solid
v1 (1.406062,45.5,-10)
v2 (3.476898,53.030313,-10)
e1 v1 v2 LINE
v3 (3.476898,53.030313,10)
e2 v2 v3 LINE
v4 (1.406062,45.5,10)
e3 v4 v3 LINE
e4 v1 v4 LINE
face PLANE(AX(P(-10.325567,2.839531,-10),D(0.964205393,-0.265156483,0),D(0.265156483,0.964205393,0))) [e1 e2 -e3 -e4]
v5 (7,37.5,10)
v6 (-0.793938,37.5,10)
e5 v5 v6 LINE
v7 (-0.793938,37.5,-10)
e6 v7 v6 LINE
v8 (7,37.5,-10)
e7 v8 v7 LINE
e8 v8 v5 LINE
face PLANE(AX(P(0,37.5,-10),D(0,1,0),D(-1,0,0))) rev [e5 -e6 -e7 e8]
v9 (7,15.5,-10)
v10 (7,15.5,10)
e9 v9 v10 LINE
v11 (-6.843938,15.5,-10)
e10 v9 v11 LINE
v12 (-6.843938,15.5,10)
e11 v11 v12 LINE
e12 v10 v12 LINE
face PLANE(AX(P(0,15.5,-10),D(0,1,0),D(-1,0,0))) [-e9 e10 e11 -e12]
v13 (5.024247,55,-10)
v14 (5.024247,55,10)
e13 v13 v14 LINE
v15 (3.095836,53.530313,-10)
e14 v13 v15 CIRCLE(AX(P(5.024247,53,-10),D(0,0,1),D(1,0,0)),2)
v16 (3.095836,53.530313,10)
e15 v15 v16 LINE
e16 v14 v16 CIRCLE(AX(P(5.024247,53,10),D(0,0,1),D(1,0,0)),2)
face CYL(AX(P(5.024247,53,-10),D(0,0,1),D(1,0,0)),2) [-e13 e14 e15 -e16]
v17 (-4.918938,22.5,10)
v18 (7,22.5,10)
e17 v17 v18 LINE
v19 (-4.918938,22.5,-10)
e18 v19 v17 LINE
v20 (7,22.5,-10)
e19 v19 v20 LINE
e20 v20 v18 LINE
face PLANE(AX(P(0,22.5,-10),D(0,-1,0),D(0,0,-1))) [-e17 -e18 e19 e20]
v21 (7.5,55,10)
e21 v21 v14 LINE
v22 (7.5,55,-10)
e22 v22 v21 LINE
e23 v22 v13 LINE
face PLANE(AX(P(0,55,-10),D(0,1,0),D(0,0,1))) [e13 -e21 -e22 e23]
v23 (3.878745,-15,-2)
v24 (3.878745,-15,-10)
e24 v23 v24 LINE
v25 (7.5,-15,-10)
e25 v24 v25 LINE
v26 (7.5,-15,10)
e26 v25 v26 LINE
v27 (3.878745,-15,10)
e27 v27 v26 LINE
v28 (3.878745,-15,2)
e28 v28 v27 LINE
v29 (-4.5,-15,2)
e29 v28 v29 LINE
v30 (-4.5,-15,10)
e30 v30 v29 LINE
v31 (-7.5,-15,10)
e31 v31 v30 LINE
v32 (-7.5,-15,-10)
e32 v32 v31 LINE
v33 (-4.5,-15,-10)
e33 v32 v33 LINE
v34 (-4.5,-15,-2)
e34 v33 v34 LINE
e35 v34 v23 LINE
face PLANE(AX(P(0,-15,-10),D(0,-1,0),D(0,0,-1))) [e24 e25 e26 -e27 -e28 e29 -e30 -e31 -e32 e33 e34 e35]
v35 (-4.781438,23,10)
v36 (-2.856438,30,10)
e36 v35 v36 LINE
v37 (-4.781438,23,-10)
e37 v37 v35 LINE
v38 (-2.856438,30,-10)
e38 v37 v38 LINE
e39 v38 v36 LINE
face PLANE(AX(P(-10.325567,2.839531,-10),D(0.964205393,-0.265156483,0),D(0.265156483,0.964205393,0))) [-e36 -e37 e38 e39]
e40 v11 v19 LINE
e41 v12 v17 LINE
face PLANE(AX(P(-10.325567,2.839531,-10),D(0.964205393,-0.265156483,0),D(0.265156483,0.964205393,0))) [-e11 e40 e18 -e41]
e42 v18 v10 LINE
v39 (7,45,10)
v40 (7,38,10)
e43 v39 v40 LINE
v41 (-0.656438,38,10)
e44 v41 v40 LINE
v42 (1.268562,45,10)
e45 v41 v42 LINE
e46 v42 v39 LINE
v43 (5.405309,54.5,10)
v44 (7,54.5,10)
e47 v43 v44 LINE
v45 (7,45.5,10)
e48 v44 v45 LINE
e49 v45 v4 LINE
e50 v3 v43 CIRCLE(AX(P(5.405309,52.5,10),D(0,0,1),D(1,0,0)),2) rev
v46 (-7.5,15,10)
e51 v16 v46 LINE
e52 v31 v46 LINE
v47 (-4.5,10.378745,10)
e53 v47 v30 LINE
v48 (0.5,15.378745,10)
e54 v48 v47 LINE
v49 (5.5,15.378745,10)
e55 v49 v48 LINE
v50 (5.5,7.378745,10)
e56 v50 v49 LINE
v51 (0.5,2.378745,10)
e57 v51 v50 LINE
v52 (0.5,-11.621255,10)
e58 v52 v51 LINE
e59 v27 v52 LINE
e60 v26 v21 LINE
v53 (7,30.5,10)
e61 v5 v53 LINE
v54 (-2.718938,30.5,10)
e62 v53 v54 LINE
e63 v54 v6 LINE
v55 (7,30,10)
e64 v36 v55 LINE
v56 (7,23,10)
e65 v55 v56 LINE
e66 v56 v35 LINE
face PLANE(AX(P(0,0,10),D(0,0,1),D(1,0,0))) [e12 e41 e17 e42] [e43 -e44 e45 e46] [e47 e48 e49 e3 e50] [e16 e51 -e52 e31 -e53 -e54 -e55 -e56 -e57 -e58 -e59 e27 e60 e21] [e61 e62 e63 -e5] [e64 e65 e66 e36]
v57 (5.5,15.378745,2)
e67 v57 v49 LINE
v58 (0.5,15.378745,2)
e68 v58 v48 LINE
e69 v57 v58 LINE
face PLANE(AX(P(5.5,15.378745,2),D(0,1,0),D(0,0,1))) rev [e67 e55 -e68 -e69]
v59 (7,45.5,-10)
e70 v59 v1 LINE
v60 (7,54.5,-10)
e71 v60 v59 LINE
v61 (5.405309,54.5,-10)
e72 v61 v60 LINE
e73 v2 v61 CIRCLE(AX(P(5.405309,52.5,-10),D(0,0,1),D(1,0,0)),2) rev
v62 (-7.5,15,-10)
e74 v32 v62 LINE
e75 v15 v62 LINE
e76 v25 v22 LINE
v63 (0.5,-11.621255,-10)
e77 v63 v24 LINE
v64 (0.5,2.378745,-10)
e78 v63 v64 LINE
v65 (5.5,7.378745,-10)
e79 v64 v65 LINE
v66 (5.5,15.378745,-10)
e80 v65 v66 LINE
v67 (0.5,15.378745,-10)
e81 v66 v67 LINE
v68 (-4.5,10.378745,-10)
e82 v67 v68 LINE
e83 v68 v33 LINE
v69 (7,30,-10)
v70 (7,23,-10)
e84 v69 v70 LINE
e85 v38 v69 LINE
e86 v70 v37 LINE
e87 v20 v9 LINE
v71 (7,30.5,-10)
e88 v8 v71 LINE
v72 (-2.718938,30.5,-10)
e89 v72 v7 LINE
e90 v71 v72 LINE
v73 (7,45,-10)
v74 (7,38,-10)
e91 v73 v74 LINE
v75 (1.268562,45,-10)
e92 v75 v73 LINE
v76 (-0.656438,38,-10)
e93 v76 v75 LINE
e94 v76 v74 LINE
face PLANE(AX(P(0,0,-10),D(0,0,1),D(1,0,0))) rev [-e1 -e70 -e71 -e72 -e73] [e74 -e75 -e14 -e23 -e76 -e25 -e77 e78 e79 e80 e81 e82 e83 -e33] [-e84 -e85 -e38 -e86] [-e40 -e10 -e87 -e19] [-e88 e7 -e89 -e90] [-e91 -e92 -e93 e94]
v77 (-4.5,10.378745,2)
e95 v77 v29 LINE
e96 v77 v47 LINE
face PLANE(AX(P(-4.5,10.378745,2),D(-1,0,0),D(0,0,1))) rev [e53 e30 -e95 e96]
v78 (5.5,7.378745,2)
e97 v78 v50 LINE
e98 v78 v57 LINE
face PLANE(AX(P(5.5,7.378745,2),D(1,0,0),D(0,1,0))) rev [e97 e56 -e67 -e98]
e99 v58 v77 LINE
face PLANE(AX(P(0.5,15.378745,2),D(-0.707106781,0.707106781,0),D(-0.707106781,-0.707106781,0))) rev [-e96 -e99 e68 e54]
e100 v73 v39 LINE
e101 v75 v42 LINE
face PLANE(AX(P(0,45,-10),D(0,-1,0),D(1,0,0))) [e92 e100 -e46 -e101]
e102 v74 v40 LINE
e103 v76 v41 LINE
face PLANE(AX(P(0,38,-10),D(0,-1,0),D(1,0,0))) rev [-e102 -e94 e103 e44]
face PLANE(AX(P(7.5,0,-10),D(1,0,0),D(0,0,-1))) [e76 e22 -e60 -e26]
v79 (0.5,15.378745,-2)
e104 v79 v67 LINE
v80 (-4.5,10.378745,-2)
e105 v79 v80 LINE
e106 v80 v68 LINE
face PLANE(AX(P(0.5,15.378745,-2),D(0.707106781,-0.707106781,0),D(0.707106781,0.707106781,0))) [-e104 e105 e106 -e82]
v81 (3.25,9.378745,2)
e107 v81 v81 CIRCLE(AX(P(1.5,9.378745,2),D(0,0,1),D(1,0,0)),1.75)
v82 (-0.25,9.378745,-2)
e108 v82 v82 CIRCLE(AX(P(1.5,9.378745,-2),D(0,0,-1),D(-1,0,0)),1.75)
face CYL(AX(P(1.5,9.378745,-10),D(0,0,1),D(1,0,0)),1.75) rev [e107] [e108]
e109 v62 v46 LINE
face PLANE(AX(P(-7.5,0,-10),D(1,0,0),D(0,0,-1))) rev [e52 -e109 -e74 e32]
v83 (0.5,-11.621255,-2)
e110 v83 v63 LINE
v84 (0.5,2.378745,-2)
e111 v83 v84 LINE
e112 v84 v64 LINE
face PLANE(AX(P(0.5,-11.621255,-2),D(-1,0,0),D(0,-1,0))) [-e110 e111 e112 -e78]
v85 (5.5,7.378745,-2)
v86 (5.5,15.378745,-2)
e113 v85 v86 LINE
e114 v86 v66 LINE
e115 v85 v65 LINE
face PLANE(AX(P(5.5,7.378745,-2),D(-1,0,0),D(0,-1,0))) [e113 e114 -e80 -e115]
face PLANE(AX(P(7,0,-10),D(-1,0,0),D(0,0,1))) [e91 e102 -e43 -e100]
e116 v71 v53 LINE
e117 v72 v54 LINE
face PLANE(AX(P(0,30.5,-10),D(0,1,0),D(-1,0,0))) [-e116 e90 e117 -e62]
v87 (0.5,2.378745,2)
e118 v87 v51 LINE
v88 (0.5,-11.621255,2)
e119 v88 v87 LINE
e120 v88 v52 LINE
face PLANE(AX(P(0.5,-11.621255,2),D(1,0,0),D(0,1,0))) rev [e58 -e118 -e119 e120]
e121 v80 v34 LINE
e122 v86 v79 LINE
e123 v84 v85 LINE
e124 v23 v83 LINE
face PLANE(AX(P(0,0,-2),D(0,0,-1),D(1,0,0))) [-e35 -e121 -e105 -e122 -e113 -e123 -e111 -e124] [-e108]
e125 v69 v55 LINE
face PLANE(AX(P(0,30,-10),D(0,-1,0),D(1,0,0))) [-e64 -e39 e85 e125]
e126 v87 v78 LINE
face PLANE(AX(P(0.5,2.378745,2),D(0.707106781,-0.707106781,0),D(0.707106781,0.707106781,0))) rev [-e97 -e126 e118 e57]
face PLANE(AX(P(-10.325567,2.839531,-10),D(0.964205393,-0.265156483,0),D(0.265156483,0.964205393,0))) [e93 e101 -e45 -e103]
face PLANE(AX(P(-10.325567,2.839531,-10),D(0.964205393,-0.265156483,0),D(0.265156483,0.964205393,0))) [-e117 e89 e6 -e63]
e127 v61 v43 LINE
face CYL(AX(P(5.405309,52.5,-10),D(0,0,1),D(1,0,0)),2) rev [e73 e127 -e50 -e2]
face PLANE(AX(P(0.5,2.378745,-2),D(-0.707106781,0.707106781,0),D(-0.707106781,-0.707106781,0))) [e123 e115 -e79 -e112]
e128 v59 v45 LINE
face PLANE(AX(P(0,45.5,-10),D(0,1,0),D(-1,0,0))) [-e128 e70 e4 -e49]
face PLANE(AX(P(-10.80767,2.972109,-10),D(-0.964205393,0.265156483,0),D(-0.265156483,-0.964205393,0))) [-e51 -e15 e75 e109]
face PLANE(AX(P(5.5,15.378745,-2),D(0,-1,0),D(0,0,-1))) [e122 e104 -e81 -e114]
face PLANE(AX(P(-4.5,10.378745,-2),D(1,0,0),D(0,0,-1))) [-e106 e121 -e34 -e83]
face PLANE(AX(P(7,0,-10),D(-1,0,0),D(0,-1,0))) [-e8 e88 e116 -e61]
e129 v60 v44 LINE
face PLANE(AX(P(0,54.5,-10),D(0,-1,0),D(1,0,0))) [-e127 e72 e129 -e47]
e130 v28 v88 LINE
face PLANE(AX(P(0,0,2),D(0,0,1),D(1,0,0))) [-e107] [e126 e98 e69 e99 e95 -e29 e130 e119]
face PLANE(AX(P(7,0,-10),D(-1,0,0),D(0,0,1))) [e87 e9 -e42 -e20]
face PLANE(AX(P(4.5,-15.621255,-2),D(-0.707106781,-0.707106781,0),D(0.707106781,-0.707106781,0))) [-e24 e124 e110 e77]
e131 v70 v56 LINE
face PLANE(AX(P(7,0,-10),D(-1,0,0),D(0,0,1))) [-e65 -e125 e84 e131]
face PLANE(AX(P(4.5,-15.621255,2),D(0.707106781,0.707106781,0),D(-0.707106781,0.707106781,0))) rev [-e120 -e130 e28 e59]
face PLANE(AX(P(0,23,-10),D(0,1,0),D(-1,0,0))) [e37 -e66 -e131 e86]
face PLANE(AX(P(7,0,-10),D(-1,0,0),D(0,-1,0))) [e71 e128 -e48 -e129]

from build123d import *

# Parameters (mm, degrees)
BOSS_EXTRUDE1_DEPTH      = 10
BOSS_EXTRUDE1_DEPTH_BACK = 10
CUT_EXTRUDE1_DEPTH       = 8
CUT_EXTRUDE2_DEPTH       = 57.402570863
CUT_EXTRUDE2_DEPTH_BACK  = 57.402570863
SKETCH4_R                = 1.75


with BuildPart() as part:
    # Sketch1 → Boss-Extrude1 (new, two sides: drawn at the far end of the back side and taken through both)
    with BuildSketch(Plane.XY.offset(-BOSS_EXTRUDE1_DEPTH_BACK)):
        with BuildLine():
            Line((7.5, -15), (7.5, 15))
            Line((7.5, 15), (7.5, 55))
            Line((7.5, 55), (5.024246851, 55))
            ThreePointArc((5.024246851, 55), (3.811940358, 54.590695749), (3.095836066, 53.530312966))
            Line((3.095836066, 53.530312966), (-7.5, 15))
            Line((-7.5, 15), (-7.5, -15))
            Line((-7.5, -15), (7.5, -15))
        make_face()
        Polygon((7, 15.5), (-6.843938287, 15.5), (-4.918938287, 22.5), (7, 22.5), align=None, mode=Mode.SUBTRACT)
        Polygon((7, 30), (7, 23), (-4.781438287, 23), (-2.856438287, 30), align=None, mode=Mode.SUBTRACT)
        Polygon((7, 37.5), (7, 30.5), (-2.718938287, 30.5), (-0.793938287, 37.5), align=None, mode=Mode.SUBTRACT)
        Polygon((7, 38), (-0.656438287, 38), (1.268561713, 45), (7, 45), align=None, mode=Mode.SUBTRACT)
        with BuildLine():
            ThreePointArc((3.476897778, 53.030312966), (4.193002071, 54.090695749), (5.405308564, 54.5))
            Line((5.405308564, 54.5), (7, 54.5))
            Line((7, 54.5), (7, 45.5))
            Line((7, 45.5), (1.406061713, 45.5))
            Line((1.406061713, 45.5), (3.476897778, 53.030312966))
        make_face(mode=Mode.SUBTRACT)
    extrude(amount=BOSS_EXTRUDE1_DEPTH + BOSS_EXTRUDE1_DEPTH_BACK)

    # Sketch2 → Cut-Extrude1 (cut)
    with BuildSketch(Plane.XY.offset(10)):
        Polygon((5.5, 7.378745231), (5.5, 15.378745231), (0.5, 15.378745231), (-4.5, 10.378745231), (-4.5, -15.621254769), (4.5, -15.621254769), (0.5, -11.621254769), (0.5, 2.378745231), align=None)
    cut_extrude1 = extrude(amount=-CUT_EXTRUDE1_DEPTH, mode=Mode.SUBTRACT)

    # Mirror1: Cut-Extrude1 across plane
    add(cut_extrude1.mirror(Plane.XY), mode=Mode.SUBTRACT)

    # Sketch4 → Cut-Extrude2 (cut, two sides: drawn at the far end of the back side and taken through both)
    with BuildSketch(Plane.XY.offset(-CUT_EXTRUDE2_DEPTH_BACK)):
        with Locations((1.5, 9.378745231)):
            Circle(SKETCH4_R)
    extrude(amount=CUT_EXTRUDE2_DEPTH + CUT_EXTRUDE2_DEPTH_BACK, mode=Mode.SUBTRACT)


solid = part.part
